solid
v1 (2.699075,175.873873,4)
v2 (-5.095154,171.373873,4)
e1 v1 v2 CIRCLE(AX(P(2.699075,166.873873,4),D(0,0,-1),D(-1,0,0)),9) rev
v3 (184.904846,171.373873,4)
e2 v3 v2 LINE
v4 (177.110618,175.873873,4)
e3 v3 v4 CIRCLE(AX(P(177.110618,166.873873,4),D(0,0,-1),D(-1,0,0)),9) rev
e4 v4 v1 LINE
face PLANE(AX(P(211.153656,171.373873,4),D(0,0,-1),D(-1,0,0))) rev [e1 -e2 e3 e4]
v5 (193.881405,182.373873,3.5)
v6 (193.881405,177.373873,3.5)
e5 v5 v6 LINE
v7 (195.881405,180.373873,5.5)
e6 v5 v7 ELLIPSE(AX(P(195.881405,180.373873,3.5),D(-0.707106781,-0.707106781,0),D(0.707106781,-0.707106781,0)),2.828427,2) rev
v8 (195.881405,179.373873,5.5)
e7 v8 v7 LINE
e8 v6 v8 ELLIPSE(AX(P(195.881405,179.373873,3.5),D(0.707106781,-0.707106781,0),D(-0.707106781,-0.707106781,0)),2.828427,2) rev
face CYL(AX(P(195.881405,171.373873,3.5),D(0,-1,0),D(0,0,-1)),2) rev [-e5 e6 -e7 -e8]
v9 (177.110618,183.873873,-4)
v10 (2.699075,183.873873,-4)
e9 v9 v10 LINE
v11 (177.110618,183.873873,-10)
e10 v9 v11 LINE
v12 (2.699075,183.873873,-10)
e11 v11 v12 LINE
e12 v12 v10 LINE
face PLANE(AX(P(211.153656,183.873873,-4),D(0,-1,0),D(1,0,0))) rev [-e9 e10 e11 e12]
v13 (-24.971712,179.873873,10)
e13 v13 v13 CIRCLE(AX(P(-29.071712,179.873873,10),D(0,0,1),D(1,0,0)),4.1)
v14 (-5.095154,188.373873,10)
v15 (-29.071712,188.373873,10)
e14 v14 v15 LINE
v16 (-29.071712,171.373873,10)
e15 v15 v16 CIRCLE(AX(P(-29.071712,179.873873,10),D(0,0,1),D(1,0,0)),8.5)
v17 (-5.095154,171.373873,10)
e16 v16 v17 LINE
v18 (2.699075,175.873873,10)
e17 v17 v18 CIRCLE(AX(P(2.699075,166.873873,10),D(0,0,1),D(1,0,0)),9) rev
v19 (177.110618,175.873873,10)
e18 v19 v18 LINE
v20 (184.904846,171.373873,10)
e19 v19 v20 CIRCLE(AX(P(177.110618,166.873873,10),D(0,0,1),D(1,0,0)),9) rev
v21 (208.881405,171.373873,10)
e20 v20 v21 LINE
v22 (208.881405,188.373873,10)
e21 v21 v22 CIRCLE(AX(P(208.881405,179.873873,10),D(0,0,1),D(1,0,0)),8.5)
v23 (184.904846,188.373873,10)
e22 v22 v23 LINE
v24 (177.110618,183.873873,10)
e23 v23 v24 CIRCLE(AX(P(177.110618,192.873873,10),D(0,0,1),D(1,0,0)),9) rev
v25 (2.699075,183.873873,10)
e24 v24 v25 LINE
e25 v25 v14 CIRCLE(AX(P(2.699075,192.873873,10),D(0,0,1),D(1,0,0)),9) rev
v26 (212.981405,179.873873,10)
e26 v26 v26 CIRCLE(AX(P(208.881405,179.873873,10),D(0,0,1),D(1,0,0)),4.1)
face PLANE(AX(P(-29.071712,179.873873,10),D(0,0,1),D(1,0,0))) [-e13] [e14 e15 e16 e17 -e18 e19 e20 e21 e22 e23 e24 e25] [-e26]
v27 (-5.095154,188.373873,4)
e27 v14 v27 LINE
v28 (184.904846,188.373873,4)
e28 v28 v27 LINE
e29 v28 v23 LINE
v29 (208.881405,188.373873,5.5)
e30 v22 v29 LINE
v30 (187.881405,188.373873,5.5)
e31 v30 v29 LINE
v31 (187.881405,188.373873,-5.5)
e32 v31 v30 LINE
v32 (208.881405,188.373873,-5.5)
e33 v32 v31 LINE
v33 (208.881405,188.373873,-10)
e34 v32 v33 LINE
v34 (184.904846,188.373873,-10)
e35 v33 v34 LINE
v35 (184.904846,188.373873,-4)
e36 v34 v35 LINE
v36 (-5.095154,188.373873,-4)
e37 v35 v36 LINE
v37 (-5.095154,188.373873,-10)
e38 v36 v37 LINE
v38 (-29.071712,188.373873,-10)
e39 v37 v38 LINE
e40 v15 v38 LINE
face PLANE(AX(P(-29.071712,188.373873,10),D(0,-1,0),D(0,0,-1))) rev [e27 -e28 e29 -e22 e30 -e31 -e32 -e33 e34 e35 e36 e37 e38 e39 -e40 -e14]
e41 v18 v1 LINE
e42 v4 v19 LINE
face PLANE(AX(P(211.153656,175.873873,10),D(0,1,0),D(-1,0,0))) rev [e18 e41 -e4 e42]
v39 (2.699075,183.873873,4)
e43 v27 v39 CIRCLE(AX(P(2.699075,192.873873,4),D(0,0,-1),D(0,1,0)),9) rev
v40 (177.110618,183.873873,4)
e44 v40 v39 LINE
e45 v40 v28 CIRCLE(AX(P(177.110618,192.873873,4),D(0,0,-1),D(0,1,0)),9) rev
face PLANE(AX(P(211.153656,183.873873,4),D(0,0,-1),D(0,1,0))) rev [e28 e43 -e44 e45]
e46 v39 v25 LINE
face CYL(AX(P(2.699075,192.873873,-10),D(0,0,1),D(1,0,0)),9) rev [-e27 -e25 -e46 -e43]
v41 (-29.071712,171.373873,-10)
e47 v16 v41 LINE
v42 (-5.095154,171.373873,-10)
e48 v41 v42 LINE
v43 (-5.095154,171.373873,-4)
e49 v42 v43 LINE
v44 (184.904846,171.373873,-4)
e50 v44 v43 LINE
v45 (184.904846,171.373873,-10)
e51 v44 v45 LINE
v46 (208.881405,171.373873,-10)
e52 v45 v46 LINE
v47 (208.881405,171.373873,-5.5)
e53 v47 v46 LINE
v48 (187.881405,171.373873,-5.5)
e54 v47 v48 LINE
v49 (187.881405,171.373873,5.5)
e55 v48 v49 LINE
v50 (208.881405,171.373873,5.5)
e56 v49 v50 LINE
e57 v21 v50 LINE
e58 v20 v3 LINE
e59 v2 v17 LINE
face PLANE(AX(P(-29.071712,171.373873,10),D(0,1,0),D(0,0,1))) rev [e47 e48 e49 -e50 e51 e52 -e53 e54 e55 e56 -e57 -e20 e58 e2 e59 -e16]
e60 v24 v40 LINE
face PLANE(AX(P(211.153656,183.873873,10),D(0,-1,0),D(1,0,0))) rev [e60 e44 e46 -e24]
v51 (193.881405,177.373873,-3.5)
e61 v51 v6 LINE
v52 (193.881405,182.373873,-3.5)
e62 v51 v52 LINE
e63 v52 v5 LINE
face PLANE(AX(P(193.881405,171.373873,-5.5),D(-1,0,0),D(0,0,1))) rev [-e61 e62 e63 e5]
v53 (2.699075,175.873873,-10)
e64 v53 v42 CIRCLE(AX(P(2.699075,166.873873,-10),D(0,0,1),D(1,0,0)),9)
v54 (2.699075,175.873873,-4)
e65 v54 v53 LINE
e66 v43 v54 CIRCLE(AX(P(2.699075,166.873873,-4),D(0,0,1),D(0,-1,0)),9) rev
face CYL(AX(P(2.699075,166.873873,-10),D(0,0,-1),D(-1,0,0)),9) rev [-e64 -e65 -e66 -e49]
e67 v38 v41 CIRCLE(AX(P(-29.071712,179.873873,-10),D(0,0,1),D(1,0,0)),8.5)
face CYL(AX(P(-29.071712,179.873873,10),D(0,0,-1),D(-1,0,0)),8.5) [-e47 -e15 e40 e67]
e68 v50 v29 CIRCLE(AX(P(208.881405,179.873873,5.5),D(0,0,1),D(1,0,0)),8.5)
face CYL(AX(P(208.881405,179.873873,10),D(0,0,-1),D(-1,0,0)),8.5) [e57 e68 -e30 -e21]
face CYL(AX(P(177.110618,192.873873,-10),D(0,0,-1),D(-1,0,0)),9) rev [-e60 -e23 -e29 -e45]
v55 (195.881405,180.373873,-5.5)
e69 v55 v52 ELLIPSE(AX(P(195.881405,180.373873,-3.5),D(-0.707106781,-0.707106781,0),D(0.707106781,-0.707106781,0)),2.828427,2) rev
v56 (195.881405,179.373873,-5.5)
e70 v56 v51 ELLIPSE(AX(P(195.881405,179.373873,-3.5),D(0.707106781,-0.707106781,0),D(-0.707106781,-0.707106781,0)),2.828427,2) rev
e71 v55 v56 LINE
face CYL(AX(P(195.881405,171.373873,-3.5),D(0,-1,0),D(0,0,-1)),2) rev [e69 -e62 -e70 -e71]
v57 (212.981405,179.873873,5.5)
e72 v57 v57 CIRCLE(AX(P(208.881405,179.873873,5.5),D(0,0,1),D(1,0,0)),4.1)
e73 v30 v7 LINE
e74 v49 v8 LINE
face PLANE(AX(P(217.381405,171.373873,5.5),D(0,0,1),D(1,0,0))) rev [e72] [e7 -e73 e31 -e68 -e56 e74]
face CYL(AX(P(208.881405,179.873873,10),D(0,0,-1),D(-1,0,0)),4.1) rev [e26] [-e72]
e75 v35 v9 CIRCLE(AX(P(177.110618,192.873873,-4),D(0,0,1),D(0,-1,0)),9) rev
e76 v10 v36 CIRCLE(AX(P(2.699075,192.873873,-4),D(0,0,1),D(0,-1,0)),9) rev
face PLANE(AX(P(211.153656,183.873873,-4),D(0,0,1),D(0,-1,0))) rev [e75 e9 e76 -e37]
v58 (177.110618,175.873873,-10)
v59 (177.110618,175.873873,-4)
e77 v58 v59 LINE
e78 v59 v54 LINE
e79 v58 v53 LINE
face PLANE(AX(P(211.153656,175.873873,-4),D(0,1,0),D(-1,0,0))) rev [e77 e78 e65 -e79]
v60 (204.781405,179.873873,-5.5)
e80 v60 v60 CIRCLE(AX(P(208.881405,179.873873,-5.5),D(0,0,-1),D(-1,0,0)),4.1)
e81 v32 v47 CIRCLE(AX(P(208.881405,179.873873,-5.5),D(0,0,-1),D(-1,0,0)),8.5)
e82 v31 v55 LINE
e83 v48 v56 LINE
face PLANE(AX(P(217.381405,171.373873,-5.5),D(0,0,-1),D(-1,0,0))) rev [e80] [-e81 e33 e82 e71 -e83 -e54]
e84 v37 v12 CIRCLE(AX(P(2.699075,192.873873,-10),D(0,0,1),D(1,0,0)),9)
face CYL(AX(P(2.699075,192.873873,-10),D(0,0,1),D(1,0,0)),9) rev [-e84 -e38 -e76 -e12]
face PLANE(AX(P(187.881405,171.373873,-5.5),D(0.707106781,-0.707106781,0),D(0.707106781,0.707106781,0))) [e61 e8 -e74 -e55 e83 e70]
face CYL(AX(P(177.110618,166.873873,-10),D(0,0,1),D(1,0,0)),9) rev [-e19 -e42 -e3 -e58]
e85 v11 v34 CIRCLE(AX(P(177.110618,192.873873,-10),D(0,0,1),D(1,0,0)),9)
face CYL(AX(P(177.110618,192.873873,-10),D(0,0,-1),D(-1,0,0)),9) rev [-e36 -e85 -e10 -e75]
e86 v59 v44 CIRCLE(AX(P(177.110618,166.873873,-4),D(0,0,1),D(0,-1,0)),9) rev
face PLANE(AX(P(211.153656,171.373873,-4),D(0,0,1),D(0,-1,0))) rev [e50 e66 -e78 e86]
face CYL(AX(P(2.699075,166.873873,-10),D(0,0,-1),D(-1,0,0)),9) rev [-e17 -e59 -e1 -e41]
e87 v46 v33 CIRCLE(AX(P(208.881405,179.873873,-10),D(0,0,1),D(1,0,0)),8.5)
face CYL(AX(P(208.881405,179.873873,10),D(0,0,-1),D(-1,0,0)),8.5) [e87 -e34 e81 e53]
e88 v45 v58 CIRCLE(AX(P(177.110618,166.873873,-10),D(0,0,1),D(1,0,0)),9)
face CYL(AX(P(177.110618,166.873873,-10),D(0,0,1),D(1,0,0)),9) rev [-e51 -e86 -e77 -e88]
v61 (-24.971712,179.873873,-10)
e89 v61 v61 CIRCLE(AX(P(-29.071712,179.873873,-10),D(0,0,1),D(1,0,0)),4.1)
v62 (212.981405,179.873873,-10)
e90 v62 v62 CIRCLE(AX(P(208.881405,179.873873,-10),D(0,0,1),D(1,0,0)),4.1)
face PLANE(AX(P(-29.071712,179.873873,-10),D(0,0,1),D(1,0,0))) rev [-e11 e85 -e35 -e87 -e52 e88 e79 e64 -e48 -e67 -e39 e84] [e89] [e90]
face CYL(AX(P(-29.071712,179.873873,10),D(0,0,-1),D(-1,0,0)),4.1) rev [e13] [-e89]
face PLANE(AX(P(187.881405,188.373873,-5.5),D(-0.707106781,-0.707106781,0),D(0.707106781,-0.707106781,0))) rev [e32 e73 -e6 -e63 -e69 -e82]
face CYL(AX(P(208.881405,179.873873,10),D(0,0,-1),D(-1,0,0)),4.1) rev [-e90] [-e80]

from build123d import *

# Parameters (mm, degrees)
ESBO_O1_R                = 4.1
RESSALTO_EXTRUS_O1_DEPTH = 10
ESBO_O2_W                = 23.5
ESBO_O2_H                = 11
CORTE_EXTRUS_O1_DEPTH    = 219.274311432
FILETE1_R                = 2
ESBO_O4_W                = 190
ESBO_O4_H                = 36.622024969
CORTE_EXTRUS_O3_DEPTH    = 289.339020898
RESSALTO_EXTRUS_O2_DEPTH = 190
FILETE3_R                = 9
CORTE_EXTRUS_O4_DEPTH    = 5.5


with BuildPart() as part:
    # Esboço1 → Ressalto-extrusão1 (new, symmetric)
    with BuildSketch(Plane.XY):
        with BuildLine():
            Line((-29.071712183, 188.373872767), (208.88140452, 188.373872767))
            ThreePointArc((208.88140452, 188.373872767), (217.38140452, 179.873872767), (208.88140452, 171.373872767))
            Line((208.88140452, 171.373872767), (-29.071712183, 171.373872767))
            ThreePointArc((-29.071712183, 171.373872767), (-37.571712183, 179.873872767), (-29.071712183, 188.373872767))
        make_face()
        with Locations((-29.071712183, 179.873872767)):
            Circle(ESBO_O1_R, mode=Mode.SUBTRACT)
        with Locations((208.88140452, 179.873872767)):
            Circle(ESBO_O1_R, mode=Mode.SUBTRACT)
    extrude(amount=RESSALTO_EXTRUS_O1_DEPTH, both=True)

    # Esboço2 → Corte-extrusão1 (cut, through all)
    with BuildSketch(Plane(origin=(0, 188.373872767, 0), x_dir=(1, 0, 0), z_dir=(0, 1, 0))):
        with Locations((205.63140452, 0)):
            Rectangle(ESBO_O2_W, ESBO_O2_H)
    extrude(amount=-CORTE_EXTRUS_O1_DEPTH, mode=Mode.SUBTRACT)

    # Filete1
    filete1_edges = [part.edges().sort_by_distance(p)[0] for p in [
        (193.88140452, 179.873872767, -5.5),
        (193.88140452, 179.873872767, 5.5),
    ]]
    fillet(filete1_edges, radius=FILETE1_R)

    # Esboço4 → Corte-extrusão3 (cut, through all)
    with BuildSketch(Plane.XY.offset(10)):
        with Locations((89.904846169, 172.82617811)):
            Rectangle(ESBO_O4_W, ESBO_O4_H)
    extrude(amount=-CORTE_EXTRUS_O3_DEPTH, mode=Mode.SUBTRACT)


with BuildPart() as corte_extrus_o3_piece_1:
    # of the separate pieces the step leaves, piece 1, a body of its own (corte_extrus_o3_pieces)
    add(part.part.solids().sort_by_distance((-5.095153831, 188.373872767, -10))[0])



with BuildPart() as corte_extrus_o3_piece_2:
    # of the separate pieces the step leaves, piece 2, a body of its own (corte_extrus_o3_pieces)
    add(part.part.solids().sort_by_distance((193.88140452, 188.373872767, 3.5))[0])


with BuildPart() as corte_extrus_o3_piece_1_1:
    add(corte_extrus_o3_piece_1.part)

    add(corte_extrus_o3_piece_2.part)  # Ressalto-extrusão2 merges Corte-extrusão3 piece 2
    # Esboço5 → Ressalto-extrusão2 (add)
    with BuildSketch(Plane(origin=(-5.095153831, 0, 0), x_dir=(0, 0, -1), z_dir=(1, 0, 0))):
        Polygon((4, 171.373872767), (-4, 171.373872767), (-4, 175.873872767), (-10, 175.873872767), (-10, 183.873872767), (-4, 183.873872767), (-4, 188.373872767), (4, 188.373872767), (4, 183.873872767), (10, 183.873872767), (10, 175.873872767), (4, 175.873872767), align=None)
    extrude(amount=RESSALTO_EXTRUS_O2_DEPTH)

    # Filete3
    # the kernel refuses this fillet: 9 mm, written as the material it adds along each edge
    with BuildSketch(Plane(origin=(-5.095153831, 183.873872767, 10), x_dir=(1, 0, 0), z_dir=(0, 0, -1))) as filete3_piece_1_section:
        with BuildLine():
            CenterArc((7.794228634, -9), FILETE3_R, 90, 60)
            Line((0, -4.5), (-0.155884573, -4.41))
            ThreePointArc((-0.155884573, -4.41), (-0.18, -2.25), (-0.18, 0))
            Line((-0.18, 0), (0, 0.18))
            Line((0, 0.18), (7.794228634, 0.18))
            Line((7.794228634, 0.18), (7.794228634, 0))
        make_face()
    filete3_piece_1 = extrude(amount=25.485571585, mode=Mode.PRIVATE)
    filete3_piece_1 = split(filete3_piece_1, bisect_by=Plane(origin=(-5.095153831, 183.873872767, -10), z_dir=(0, 0, 1)), keep=Keep.TOP, mode=Mode.PRIVATE)
    add(filete3_piece_1)
    with BuildSketch(Plane(origin=(184.904846169, 175.873872767, -15.485571585), x_dir=(0, -1, 0), z_dir=(0, 0, 1))) as filete3_piece_2_section:
        with BuildLine():
            CenterArc((9, -7.794228634), FILETE3_R, 120, 60)
            Line((0, -7.794228634), (-0.18, -7.794228634))
            Line((-0.18, -7.794228634), (-0.18, 0))
            Line((-0.18, 0), (0, 0.18))
            ThreePointArc((0, 0.18), (2.25, 0.18), (4.41, 0.155884573))
            Line((4.41, 0.155884573), (4.5, 0))
        make_face()
    filete3_piece_2 = extrude(amount=25.485571585, mode=Mode.PRIVATE)
    filete3_piece_2 = split(filete3_piece_2, bisect_by=Plane(origin=(184.904846169, 175.873872767, -10), z_dir=(0, 0, 1)), keep=Keep.TOP, mode=Mode.PRIVATE)
    add(filete3_piece_2)
    with BuildSketch(Plane(origin=(184.904846169, 175.873872767, -10), x_dir=(0, -1, 0), z_dir=(0, 0, 1))) as filete3_piece_3_section:
        with BuildLine():
            CenterArc((9, -7.794228634), FILETE3_R, 120, 60)
            Line((0, -7.794228634), (-0.18, -7.794228634))
            Line((-0.18, -7.794228634), (-0.18, 0))
            Line((-0.18, 0), (0, 0.18))
            ThreePointArc((0, 0.18), (2.25, 0.18), (4.41, 0.155884573))
            Line((4.41, 0.155884573), (4.5, 0))
        make_face()
    filete3_piece_3 = extrude(amount=25.485571585, mode=Mode.PRIVATE)
    filete3_piece_3 = split(filete3_piece_3, bisect_by=Plane(origin=(184.904846169, 175.873872767, 10), z_dir=(0, 0, -1)), keep=Keep.TOP, mode=Mode.PRIVATE)
    add(filete3_piece_3)
    with BuildSketch(Plane(origin=(184.904846169, 183.873872767, 10), x_dir=(0, 1, 0), z_dir=(0, 0, -1))) as filete3_piece_4_section:
        with BuildLine():
            CenterArc((9, -7.794228634), FILETE3_R, 120, 60)
            Line((0, -7.794228634), (-0.18, -7.794228634))
            Line((-0.18, -7.794228634), (-0.18, 0))
            Line((-0.18, 0), (0, 0.18))
            ThreePointArc((0, 0.18), (2.25, 0.18), (4.41, 0.155884573))
            Line((4.41, 0.155884573), (4.5, 0))
        make_face()
    filete3_piece_4 = extrude(amount=25.485571585, mode=Mode.PRIVATE)
    filete3_piece_4 = split(filete3_piece_4, bisect_by=Plane(origin=(184.904846169, 183.873872767, -10), z_dir=(0, 0, 1)), keep=Keep.TOP, mode=Mode.PRIVATE)
    add(filete3_piece_4)
    with BuildSketch(Plane(origin=(184.904846169, 183.873872767, 15.485571585), x_dir=(0, 1, 0), z_dir=(0, 0, -1))) as filete3_piece_5_section:
        with BuildLine():
            CenterArc((9, -7.794228634), FILETE3_R, 120, 60)
            Line((0, -7.794228634), (-0.18, -7.794228634))
            Line((-0.18, -7.794228634), (-0.18, 0))
            Line((-0.18, 0), (0, 0.18))
            ThreePointArc((0, 0.18), (2.25, 0.18), (4.41, 0.155884573))
            Line((4.41, 0.155884573), (4.5, 0))
        make_face()
    filete3_piece_5 = extrude(amount=25.485571585, mode=Mode.PRIVATE)
    filete3_piece_5 = split(filete3_piece_5, bisect_by=Plane(origin=(184.904846169, 183.873872767, 10), z_dir=(0, 0, -1)), keep=Keep.TOP, mode=Mode.PRIVATE)
    add(filete3_piece_5)
    with BuildSketch(Plane(origin=(-5.095153831, 175.873872767, -10), x_dir=(1, 0, 0), z_dir=(0, 0, 1))) as filete3_piece_6_section:
        with BuildLine():
            CenterArc((7.794228634, -9), FILETE3_R, 90, 60)
            Line((0, -4.5), (-0.155884573, -4.41))
            ThreePointArc((-0.155884573, -4.41), (-0.18, -2.25), (-0.18, 0))
            Line((-0.18, 0), (0, 0.18))
            Line((0, 0.18), (7.794228634, 0.18))
            Line((7.794228634, 0.18), (7.794228634, 0))
        make_face()
    filete3_piece_6 = extrude(amount=25.485571585, mode=Mode.PRIVATE)
    filete3_piece_6 = split(filete3_piece_6, bisect_by=Plane(origin=(-5.095153831, 175.873872767, 10), z_dir=(0, 0, -1)), keep=Keep.TOP, mode=Mode.PRIVATE)
    add(filete3_piece_6)
    with BuildSketch(Plane(origin=(-5.095153831, 183.873872767, 15.485571585), x_dir=(0, 1, 0), z_dir=(0, 0, -1))) as filete3_piece_7_section:
        with BuildLine():
            CenterArc((9, 7.794228634), FILETE3_R, 180, 60)
            Line((0, 7.794228634), (-0.18, 7.794228634))
            Line((-0.18, 7.794228634), (-0.18, 0))
            Line((-0.18, 0), (0, -0.18))
            ThreePointArc((0, -0.18), (2.25, -0.18), (4.41, -0.155884573))
            Line((4.41, -0.155884573), (4.5, 0))
        make_face()
    filete3_piece_7 = extrude(amount=25.485571585, mode=Mode.PRIVATE)
    filete3_piece_7 = split(filete3_piece_7, bisect_by=Plane(origin=(-5.095153831, 183.873872767, 10), z_dir=(0, 0, -1)), keep=Keep.TOP, mode=Mode.PRIVATE)
    add(filete3_piece_7)
    with BuildSketch(Plane(origin=(-5.095153831, 175.873872767, -15.485571585), x_dir=(1, 0, 0), z_dir=(0, 0, 1))) as filete3_piece_8_section:
        with BuildLine():
            CenterArc((7.794228634, -9), FILETE3_R, 90, 60)
            Line((0, -4.5), (-0.155884573, -4.41))
            ThreePointArc((-0.155884573, -4.41), (-0.18, -2.25), (-0.18, 0))
            Line((-0.18, 0), (0, 0.18))
            Line((0, 0.18), (7.794228634, 0.18))
            Line((7.794228634, 0.18), (7.794228634, 0))
        make_face()
    filete3_piece_8 = extrude(amount=25.485571585, mode=Mode.PRIVATE)
    filete3_piece_8 = split(filete3_piece_8, bisect_by=Plane(origin=(-5.095153831, 175.873872767, -10), z_dir=(0, 0, 1)), keep=Keep.TOP, mode=Mode.PRIVATE)
    add(filete3_piece_8)

    # Esboço6 → Corte-extrusão4 (cut, symmetric)
    with BuildSketch(Plane.XY):
        Polygon((208.88140452, 179.873872767), (196.38140452, 179.873872767), (187.88140452, 188.373872767), (187.88140452, 194.300401894), (208.88140452, 194.300401894), align=None)
    corte_extrus_o4 = extrude(amount=CORTE_EXTRUS_O4_DEPTH, both=True, mode=Mode.SUBTRACT)

    # Espelhar1: Corte-extrusão4 across plane
    add(corte_extrus_o4.mirror(Plane.ZX.offset(179.873872767)), mode=Mode.SUBTRACT)


solid = corte_extrus_o3_piece_1_1.part
